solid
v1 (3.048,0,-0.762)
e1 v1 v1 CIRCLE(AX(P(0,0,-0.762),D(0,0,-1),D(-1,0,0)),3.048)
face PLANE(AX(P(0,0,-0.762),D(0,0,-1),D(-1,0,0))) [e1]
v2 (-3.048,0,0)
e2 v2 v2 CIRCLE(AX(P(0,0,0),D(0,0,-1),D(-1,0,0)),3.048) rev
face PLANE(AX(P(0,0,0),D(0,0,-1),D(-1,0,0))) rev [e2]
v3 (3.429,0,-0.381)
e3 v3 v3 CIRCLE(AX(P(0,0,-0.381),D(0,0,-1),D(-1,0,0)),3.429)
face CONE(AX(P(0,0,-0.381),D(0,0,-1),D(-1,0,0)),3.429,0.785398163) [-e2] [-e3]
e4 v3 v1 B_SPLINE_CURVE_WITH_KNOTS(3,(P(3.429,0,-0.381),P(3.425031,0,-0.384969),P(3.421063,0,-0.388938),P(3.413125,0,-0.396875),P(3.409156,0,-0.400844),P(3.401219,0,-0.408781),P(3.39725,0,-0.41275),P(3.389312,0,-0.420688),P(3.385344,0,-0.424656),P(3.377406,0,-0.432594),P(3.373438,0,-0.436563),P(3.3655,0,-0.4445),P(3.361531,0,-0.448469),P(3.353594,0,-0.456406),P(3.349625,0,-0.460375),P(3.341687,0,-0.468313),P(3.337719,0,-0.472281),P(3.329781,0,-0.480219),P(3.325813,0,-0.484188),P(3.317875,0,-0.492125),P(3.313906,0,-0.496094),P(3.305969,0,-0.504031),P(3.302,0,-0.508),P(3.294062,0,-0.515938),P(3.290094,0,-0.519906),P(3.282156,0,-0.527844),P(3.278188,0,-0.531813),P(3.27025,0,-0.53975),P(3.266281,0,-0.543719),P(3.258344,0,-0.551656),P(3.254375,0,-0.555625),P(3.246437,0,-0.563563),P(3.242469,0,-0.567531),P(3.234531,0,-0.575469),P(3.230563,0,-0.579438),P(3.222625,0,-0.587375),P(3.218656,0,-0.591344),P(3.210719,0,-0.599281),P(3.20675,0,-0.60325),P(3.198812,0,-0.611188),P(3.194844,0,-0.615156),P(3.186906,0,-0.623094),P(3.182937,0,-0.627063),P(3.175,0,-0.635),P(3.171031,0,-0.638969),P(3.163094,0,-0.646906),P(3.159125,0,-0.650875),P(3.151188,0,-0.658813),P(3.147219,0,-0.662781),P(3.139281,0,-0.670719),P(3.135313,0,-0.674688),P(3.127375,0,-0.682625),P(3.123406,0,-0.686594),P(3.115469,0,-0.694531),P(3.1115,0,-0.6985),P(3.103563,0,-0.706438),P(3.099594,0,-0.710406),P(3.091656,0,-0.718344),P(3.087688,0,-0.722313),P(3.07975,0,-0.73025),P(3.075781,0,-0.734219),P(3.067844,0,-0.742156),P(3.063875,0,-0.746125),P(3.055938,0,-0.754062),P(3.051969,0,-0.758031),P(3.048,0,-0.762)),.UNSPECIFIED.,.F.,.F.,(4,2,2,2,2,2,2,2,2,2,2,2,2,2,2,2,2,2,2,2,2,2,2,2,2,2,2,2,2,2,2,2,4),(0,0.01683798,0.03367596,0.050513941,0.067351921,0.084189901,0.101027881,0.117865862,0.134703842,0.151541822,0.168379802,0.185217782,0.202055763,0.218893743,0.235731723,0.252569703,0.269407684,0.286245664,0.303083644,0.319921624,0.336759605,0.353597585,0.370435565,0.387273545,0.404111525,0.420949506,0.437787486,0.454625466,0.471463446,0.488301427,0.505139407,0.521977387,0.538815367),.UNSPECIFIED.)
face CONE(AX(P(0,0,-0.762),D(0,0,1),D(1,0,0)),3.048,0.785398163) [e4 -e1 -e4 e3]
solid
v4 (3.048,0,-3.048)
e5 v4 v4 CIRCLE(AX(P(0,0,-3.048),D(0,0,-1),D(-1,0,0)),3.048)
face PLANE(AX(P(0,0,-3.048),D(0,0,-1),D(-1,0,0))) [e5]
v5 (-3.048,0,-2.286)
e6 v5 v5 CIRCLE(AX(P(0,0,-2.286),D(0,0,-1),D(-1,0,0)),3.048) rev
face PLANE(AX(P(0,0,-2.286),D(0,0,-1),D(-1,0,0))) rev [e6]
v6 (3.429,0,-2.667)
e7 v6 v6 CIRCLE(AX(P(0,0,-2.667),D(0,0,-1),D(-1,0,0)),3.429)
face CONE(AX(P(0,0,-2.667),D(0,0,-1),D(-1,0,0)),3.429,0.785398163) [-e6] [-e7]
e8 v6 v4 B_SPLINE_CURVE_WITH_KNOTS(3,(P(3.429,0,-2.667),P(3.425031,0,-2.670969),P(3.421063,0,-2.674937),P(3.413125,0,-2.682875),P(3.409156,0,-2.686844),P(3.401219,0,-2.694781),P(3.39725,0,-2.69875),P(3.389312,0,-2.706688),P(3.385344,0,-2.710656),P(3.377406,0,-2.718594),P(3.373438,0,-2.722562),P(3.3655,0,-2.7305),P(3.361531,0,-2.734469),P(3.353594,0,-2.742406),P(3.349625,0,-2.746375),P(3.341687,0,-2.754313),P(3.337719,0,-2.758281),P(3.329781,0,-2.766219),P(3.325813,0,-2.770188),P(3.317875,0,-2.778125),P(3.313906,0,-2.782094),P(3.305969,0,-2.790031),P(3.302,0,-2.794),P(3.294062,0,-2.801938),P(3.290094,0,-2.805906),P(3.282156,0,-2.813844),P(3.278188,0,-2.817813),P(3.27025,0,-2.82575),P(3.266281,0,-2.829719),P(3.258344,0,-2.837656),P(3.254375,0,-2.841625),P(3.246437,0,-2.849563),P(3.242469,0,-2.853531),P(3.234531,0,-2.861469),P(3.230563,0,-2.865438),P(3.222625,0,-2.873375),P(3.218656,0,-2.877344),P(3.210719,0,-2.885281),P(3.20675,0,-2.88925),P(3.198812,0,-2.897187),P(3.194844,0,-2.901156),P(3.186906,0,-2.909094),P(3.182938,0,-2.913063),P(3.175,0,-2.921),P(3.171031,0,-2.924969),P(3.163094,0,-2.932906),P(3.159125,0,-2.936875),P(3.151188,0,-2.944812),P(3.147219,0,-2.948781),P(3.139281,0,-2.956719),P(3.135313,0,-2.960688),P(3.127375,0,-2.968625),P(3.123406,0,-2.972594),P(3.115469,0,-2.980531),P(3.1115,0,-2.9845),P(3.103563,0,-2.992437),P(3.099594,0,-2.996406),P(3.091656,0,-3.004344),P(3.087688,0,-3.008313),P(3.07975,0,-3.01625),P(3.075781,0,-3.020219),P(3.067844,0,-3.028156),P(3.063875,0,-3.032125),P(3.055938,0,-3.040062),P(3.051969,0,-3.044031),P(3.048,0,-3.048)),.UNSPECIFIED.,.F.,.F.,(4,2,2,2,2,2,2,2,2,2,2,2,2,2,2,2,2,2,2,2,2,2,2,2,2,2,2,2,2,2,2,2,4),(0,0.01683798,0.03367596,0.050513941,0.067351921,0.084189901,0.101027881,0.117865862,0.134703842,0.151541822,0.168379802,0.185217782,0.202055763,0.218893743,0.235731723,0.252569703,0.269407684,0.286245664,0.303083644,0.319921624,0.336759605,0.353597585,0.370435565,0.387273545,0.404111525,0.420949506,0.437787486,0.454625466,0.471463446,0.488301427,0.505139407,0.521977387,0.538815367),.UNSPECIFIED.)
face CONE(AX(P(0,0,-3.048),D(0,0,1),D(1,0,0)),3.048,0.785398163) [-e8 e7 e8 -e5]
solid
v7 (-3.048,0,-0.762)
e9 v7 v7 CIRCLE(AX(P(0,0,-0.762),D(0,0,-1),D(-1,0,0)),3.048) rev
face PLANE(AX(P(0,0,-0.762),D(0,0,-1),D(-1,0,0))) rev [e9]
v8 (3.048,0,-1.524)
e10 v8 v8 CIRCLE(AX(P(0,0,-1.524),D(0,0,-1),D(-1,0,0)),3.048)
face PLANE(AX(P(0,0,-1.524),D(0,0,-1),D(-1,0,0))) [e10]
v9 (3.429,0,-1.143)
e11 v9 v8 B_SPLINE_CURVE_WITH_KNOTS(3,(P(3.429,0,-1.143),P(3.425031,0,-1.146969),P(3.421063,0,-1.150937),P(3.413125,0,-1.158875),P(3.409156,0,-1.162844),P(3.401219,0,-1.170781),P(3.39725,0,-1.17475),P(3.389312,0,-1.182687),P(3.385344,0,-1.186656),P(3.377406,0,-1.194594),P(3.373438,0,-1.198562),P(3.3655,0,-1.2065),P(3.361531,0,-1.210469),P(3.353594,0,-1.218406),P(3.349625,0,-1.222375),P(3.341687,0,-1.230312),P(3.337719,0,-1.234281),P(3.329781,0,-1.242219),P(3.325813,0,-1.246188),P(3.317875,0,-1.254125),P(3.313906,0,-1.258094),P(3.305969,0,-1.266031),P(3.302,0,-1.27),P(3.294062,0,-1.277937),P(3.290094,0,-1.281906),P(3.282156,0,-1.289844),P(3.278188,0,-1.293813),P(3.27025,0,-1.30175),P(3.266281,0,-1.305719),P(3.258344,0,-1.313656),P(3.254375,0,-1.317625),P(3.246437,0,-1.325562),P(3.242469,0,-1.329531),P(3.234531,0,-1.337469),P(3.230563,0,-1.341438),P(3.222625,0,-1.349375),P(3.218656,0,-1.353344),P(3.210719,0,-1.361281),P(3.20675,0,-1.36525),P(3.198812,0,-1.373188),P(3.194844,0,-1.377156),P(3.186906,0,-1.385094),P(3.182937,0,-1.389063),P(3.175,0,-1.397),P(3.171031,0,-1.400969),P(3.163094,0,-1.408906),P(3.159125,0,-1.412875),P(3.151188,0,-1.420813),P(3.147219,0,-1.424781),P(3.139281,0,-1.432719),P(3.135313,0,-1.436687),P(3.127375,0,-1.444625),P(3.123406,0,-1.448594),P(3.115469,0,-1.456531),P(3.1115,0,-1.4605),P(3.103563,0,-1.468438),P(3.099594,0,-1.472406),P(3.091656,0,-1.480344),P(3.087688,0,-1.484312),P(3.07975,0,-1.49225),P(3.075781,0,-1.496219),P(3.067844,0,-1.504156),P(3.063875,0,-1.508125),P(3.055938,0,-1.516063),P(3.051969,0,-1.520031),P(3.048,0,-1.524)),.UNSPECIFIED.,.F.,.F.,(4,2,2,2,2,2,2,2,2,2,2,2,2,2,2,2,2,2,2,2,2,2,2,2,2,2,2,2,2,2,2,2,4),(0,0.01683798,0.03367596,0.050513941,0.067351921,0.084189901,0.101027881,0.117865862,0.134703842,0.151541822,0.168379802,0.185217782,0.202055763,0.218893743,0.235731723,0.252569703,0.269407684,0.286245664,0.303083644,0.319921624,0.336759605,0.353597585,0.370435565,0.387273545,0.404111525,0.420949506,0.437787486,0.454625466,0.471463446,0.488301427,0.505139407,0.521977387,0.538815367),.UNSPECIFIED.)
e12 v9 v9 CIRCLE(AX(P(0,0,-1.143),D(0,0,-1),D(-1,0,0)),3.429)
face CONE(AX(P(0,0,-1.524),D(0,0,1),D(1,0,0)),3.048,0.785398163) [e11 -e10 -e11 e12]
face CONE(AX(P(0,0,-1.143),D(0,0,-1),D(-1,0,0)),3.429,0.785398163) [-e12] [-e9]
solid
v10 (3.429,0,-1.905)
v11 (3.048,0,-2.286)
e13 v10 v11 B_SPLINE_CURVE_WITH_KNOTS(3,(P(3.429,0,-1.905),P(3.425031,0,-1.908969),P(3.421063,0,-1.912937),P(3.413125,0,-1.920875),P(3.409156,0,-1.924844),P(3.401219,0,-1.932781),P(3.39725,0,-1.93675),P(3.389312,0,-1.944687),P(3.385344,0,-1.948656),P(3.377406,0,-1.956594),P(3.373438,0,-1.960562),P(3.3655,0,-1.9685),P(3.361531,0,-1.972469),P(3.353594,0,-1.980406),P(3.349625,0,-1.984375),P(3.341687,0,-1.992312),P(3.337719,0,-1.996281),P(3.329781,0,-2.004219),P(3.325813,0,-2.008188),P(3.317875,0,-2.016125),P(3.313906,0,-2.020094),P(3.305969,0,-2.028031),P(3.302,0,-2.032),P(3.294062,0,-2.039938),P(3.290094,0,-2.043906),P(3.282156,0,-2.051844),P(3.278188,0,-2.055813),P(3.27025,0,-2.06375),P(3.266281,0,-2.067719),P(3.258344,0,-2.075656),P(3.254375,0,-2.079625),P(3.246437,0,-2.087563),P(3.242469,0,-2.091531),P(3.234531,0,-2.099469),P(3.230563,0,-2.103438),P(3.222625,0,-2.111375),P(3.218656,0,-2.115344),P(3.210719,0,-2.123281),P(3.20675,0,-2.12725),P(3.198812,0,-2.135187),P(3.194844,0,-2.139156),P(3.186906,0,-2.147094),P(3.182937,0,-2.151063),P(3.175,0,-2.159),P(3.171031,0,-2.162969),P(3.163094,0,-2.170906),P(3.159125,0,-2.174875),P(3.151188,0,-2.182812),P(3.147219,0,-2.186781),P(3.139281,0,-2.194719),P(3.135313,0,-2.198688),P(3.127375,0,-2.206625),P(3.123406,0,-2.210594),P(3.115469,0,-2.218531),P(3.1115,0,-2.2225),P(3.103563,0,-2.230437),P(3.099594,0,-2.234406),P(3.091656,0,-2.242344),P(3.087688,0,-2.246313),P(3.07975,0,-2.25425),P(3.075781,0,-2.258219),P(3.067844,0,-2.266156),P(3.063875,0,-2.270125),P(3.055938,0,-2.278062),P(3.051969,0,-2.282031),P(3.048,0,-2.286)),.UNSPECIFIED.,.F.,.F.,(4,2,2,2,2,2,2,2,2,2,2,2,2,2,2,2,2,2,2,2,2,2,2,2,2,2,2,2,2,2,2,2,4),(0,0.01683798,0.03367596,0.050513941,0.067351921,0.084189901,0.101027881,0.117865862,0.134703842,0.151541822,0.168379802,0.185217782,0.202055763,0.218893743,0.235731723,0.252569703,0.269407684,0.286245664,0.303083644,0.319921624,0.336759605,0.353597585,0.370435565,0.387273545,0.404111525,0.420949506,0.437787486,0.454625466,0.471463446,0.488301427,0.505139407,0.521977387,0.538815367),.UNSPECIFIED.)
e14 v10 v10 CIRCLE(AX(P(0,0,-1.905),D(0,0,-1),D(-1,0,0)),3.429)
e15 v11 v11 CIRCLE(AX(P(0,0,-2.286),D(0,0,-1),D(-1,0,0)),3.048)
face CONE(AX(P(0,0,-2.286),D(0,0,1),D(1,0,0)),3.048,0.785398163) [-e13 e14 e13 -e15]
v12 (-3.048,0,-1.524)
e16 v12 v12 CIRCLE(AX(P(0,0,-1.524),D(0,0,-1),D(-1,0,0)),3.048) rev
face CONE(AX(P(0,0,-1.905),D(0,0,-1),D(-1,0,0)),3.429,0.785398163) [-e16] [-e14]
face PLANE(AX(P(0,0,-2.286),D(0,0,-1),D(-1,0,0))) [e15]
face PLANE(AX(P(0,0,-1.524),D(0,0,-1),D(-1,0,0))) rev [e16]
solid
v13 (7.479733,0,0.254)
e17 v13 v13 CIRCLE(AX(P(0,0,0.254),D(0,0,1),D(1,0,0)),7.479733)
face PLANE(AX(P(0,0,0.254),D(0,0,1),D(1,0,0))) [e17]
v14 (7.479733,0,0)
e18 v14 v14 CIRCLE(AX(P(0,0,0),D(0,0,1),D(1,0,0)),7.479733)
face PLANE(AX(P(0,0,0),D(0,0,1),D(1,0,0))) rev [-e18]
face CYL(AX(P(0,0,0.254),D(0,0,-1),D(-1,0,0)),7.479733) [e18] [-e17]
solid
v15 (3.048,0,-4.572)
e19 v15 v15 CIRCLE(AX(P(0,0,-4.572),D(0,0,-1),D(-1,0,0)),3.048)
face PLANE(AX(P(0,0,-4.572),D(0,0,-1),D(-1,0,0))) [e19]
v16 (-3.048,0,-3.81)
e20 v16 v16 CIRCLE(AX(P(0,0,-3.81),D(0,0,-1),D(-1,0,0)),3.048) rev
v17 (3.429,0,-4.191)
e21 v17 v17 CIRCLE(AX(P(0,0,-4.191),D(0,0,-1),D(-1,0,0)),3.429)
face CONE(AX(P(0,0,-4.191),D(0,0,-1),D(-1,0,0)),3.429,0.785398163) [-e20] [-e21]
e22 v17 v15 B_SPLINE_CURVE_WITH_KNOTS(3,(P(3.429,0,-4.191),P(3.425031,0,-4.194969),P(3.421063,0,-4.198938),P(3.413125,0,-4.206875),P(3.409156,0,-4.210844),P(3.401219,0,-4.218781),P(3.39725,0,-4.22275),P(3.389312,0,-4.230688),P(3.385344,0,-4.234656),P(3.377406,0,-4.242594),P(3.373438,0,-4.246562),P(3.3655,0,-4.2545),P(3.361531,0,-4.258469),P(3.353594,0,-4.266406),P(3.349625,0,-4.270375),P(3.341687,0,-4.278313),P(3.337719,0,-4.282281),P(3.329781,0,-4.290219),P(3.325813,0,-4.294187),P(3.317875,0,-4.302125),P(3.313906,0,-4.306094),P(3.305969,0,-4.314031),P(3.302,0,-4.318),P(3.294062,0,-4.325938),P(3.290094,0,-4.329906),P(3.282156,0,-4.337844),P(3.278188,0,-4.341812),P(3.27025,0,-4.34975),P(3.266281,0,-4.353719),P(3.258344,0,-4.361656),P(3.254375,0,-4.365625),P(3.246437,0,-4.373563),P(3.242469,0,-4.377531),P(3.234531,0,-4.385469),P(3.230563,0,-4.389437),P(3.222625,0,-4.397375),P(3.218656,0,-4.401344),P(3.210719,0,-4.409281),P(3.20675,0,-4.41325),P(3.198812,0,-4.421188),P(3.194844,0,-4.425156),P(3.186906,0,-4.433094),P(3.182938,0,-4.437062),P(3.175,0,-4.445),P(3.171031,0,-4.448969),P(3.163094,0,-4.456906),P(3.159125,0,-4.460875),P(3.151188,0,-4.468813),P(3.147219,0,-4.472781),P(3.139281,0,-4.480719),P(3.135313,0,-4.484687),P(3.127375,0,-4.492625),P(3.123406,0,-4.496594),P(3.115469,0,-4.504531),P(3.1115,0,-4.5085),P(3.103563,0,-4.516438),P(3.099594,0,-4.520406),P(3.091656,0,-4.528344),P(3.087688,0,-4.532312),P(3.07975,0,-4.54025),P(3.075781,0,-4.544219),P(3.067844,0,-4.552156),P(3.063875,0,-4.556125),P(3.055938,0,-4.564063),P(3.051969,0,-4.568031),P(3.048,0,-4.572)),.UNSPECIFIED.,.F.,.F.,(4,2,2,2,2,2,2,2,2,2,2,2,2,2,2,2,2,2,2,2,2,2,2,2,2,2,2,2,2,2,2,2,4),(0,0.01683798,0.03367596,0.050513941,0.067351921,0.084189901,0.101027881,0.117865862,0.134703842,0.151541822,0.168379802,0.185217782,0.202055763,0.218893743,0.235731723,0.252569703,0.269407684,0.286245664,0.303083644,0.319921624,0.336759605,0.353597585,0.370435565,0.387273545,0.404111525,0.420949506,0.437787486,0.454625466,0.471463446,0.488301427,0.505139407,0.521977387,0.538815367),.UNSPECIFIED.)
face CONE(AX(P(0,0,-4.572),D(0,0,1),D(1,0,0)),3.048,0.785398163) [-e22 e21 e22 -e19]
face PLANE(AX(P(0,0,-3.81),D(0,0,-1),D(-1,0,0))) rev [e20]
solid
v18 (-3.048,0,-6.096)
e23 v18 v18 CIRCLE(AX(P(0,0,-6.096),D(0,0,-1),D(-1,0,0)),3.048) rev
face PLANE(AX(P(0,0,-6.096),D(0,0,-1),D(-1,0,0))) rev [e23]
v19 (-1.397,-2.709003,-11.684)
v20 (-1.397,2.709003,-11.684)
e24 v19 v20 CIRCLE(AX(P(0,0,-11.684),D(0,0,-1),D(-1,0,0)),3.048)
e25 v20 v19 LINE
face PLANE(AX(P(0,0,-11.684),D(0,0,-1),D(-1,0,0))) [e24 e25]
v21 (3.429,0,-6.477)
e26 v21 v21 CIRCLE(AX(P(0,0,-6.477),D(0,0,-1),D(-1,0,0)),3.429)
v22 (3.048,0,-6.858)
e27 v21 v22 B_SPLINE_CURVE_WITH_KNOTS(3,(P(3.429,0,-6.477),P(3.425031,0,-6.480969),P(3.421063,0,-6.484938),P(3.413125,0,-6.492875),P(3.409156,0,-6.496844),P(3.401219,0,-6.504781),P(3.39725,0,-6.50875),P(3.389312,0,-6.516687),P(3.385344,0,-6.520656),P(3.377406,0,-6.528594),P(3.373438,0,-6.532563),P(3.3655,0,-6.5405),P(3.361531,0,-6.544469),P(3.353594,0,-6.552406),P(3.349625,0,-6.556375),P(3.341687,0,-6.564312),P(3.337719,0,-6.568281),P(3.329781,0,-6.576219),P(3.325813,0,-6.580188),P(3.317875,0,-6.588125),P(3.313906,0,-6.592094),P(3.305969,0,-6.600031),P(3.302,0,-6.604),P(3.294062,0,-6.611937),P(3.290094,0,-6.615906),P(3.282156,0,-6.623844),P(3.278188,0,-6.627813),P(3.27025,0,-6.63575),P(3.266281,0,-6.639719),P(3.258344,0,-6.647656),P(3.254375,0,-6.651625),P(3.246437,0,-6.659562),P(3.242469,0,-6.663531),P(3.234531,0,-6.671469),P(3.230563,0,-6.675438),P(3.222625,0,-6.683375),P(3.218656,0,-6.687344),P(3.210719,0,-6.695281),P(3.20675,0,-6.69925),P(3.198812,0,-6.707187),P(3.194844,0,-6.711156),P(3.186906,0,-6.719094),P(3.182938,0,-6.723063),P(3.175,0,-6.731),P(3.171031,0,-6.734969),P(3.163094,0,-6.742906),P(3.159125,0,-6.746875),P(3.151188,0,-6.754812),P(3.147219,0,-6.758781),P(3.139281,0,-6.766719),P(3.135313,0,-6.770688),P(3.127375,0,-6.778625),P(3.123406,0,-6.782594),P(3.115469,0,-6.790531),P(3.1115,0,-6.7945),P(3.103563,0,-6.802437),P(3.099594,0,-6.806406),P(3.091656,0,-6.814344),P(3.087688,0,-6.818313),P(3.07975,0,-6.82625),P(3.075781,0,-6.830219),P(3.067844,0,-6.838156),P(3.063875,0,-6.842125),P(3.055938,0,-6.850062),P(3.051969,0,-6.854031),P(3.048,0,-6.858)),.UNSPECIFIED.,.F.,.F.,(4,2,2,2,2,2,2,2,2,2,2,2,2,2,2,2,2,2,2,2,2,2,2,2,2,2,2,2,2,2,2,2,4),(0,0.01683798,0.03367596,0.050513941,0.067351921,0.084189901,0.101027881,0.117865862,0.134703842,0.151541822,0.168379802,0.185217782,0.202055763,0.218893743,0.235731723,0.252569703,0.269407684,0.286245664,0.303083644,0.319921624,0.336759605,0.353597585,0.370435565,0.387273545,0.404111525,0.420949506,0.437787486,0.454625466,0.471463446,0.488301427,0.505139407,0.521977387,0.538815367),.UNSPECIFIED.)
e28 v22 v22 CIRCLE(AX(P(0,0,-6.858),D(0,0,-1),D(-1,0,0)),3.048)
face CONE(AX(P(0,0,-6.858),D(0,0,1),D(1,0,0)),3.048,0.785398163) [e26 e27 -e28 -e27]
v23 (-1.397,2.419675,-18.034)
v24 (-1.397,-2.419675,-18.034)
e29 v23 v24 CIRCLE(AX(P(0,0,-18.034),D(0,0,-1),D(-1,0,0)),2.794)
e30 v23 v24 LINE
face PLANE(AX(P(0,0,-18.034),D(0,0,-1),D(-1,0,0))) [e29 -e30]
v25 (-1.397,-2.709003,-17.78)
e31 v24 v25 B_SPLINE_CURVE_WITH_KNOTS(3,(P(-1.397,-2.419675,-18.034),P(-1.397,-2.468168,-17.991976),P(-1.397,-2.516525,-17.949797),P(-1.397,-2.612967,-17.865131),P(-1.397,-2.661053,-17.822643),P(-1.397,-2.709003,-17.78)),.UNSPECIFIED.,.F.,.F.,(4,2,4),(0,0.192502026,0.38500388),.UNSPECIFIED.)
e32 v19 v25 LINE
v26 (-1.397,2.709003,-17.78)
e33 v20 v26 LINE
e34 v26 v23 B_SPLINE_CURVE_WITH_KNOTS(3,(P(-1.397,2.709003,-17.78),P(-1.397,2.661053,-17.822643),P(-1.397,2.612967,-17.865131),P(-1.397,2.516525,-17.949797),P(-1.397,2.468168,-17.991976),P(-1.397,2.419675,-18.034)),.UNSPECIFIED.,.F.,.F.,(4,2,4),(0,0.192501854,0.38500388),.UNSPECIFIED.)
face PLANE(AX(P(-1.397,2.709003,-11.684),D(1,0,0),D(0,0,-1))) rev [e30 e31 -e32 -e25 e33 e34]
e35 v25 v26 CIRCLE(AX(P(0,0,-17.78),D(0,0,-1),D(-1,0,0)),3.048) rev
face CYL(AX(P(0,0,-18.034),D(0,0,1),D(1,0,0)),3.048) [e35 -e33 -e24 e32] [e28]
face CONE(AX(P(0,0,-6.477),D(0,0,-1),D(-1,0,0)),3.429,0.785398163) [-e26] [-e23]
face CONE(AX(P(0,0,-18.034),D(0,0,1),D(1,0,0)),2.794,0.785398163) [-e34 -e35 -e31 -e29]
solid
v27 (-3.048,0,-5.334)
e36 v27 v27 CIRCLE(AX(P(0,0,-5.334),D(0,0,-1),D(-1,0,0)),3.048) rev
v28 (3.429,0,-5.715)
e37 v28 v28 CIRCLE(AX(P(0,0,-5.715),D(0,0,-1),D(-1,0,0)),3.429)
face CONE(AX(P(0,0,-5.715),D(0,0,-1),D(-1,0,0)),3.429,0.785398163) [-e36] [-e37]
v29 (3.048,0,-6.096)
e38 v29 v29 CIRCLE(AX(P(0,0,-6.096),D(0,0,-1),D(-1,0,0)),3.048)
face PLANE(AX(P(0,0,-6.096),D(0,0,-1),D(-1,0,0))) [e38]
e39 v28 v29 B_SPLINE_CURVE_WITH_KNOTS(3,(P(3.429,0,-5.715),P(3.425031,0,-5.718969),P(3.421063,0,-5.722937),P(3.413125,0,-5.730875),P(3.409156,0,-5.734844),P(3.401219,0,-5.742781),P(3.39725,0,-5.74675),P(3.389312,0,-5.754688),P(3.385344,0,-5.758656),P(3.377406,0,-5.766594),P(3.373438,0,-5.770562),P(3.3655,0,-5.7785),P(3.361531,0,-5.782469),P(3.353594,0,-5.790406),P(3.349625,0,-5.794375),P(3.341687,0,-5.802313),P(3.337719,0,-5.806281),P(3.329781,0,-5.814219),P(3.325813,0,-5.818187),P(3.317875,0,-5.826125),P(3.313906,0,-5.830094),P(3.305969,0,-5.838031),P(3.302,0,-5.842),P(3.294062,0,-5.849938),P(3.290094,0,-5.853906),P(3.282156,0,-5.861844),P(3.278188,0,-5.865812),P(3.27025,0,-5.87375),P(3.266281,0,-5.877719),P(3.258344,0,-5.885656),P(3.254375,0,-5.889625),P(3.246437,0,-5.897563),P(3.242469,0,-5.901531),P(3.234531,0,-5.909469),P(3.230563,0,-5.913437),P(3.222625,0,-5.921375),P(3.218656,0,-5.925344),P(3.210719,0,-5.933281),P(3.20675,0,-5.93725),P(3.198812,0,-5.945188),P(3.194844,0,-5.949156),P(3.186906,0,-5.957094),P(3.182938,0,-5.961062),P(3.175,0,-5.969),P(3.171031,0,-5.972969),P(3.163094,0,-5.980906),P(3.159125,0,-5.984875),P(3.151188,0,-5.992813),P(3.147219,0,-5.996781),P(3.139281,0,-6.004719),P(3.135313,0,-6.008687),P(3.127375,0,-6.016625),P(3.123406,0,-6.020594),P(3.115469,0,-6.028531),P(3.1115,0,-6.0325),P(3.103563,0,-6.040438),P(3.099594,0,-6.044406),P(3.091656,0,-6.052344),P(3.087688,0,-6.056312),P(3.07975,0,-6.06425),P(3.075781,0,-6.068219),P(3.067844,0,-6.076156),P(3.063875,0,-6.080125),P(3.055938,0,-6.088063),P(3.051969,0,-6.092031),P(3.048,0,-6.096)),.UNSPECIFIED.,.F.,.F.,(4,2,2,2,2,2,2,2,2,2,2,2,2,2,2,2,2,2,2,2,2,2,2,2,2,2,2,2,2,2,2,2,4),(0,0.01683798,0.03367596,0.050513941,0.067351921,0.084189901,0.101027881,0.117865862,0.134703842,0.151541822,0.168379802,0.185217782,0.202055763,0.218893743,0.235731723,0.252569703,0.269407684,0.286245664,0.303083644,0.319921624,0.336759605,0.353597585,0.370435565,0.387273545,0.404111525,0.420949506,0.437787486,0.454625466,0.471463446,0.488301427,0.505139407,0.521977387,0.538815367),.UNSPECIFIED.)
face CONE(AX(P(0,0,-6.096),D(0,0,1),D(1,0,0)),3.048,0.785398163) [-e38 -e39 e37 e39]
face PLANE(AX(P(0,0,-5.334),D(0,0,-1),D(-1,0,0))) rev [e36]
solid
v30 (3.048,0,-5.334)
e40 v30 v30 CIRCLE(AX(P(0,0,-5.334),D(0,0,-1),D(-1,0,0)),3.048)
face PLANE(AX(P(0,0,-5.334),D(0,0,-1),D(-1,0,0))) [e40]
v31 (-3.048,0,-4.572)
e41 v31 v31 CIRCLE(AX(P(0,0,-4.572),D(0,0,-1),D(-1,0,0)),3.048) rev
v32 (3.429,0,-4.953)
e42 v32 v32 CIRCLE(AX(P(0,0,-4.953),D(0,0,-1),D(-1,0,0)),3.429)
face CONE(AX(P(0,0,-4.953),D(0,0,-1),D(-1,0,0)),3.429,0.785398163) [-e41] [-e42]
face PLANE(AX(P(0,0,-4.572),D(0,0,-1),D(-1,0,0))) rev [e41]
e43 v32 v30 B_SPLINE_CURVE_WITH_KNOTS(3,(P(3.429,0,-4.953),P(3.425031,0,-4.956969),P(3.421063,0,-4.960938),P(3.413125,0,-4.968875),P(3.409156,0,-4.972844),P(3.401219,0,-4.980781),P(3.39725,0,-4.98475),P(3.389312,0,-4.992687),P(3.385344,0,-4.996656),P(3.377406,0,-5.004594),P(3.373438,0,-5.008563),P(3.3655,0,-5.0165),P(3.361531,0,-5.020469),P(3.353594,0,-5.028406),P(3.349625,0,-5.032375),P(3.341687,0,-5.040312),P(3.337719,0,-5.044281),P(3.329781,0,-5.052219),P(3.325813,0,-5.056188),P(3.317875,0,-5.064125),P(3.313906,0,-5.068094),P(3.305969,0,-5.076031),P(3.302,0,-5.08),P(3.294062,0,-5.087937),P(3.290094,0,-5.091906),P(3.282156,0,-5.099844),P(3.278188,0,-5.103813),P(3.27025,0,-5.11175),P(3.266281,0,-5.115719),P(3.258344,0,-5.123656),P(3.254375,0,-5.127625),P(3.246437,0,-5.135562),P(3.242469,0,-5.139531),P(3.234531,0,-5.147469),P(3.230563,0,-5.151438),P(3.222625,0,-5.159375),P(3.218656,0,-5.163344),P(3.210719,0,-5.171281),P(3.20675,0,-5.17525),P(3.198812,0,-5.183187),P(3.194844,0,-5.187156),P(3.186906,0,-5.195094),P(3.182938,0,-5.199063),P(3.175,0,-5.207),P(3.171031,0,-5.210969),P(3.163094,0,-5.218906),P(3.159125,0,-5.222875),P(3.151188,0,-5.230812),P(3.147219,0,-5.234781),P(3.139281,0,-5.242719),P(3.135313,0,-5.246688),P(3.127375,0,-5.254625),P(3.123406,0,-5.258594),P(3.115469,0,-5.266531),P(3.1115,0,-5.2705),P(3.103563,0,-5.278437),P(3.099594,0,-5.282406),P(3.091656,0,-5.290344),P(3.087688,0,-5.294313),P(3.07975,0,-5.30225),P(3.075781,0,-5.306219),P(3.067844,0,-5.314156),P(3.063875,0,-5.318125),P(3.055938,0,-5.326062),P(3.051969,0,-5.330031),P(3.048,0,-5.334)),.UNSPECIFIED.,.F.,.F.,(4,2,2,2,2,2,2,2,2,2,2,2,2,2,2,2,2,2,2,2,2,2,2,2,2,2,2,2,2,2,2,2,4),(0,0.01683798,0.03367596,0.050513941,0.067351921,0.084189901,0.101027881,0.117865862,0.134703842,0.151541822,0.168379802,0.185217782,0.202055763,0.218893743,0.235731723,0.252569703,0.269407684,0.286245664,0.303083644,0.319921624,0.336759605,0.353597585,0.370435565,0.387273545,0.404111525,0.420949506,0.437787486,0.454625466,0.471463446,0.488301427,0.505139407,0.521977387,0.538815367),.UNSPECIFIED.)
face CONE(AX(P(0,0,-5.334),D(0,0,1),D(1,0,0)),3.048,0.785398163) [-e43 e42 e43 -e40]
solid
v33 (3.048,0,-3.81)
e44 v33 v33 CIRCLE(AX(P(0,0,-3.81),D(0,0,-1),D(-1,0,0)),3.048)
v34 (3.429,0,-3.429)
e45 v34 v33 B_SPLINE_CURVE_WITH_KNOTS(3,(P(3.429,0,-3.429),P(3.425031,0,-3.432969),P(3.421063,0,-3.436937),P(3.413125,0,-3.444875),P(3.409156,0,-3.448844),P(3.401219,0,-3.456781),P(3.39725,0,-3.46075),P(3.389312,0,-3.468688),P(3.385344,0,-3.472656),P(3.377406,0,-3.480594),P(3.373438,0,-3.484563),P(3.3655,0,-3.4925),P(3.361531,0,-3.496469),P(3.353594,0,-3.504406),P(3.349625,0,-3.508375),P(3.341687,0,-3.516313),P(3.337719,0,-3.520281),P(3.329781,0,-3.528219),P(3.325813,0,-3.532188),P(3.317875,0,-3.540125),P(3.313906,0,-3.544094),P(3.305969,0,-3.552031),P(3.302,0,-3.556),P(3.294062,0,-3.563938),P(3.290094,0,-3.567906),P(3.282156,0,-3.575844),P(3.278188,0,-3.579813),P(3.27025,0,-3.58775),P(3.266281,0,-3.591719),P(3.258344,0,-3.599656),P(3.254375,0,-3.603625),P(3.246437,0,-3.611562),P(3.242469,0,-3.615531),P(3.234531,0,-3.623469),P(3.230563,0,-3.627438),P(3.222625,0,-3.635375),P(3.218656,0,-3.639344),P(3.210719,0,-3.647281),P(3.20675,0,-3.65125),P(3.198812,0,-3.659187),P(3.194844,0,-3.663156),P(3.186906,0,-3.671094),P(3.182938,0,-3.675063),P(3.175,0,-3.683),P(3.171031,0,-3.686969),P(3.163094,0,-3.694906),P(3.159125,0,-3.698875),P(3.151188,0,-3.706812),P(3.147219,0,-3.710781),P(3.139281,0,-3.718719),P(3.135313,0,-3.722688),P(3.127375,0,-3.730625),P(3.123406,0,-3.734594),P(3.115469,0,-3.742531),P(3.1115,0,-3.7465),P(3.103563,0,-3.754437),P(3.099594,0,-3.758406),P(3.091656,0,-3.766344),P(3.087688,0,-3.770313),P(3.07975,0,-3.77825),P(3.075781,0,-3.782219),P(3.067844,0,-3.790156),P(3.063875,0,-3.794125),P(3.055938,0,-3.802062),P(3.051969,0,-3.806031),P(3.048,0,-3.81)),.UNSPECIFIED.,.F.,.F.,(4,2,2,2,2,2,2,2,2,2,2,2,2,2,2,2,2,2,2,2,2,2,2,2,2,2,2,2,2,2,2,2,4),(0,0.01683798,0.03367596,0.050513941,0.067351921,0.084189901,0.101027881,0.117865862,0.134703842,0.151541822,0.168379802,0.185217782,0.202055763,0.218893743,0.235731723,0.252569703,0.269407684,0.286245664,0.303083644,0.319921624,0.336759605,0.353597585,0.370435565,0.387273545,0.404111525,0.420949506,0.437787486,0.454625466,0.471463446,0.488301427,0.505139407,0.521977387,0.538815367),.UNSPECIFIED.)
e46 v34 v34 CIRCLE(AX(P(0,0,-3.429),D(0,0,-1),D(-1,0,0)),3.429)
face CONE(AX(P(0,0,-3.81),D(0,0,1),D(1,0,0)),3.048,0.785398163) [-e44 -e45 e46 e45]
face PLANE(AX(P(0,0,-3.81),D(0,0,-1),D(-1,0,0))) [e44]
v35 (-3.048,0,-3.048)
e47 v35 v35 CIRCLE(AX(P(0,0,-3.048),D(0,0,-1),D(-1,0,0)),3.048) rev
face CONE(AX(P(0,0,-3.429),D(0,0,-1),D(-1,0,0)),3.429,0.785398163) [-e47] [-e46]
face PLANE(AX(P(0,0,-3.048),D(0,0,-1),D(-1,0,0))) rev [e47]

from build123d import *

# Parameters (mm, degrees)
SKETCH1_R           = 7.479732897
BOSS_EXTRUDE1_DEPTH = 0.254
SKETCH2_R           = 3.429
BOSS_EXTRUDE2_DEPTH = 0.762
CHAMFER1_SIZE       = 0.381
LPATTERN3_COUNT     = 9
LPATTERN3_PITCH     = 0.762
SKETCH3_R           = 3.048
BOSS_EXTRUDE3_DEPTH = 11.176
CUT_EXTRUDE1_DEPTH  = 6.35
CHAMFER2_SIZE       = 0.254


with BuildPart() as part:
    # Sketch1 → Boss-Extrude1 (new body)
    with BuildSketch(Plane.XY):
        Circle(SKETCH1_R)
    extrude(amount=BOSS_EXTRUDE1_DEPTH)


with BuildPart() as body_2:
    # Sketch2 → Boss-Extrude2 (new body)
    with BuildSketch(Plane(origin=(0, 0, 0), x_dir=(-1, 0, 0), z_dir=(0, 0, -1))):
        with Locations(Location((0, 0, 0), (0, 0, 180))):
            Circle(SKETCH2_R)
    extrude(amount=BOSS_EXTRUDE2_DEPTH)

    # Chamfer1
    chamfer1_edges = [body_2.edges().sort_by_distance(p)[0] for p in [
        (-3.429, 0, 0),
        (-3.429, 0, -0.762),
    ]]
    chamfer(chamfer1_edges, length=CHAMFER1_SIZE - 0.0001)  # a hair under: the kernel refuses the full size


with BuildPart() as lpattern3_1:
    # LPattern3: pattern copy
    add(body_2.part.moved(Location(Vector(0, 0, -1) * (1 * LPATTERN3_PITCH))))


with BuildPart() as lpattern3_2:
    # LPattern3: pattern copy
    add(body_2.part.moved(Location(Vector(0, 0, -1) * (2 * LPATTERN3_PITCH))))


with BuildPart() as lpattern3_3:
    # LPattern3: pattern copy
    add(body_2.part.moved(Location(Vector(0, 0, -1) * (3 * LPATTERN3_PITCH))))


with BuildPart() as lpattern3_4:
    # LPattern3: pattern copy
    add(body_2.part.moved(Location(Vector(0, 0, -1) * (4 * LPATTERN3_PITCH))))


with BuildPart() as lpattern3_5:
    # LPattern3: pattern copy
    add(body_2.part.moved(Location(Vector(0, 0, -1) * (5 * LPATTERN3_PITCH))))


with BuildPart() as lpattern3_6:
    # LPattern3: pattern copy
    add(body_2.part.moved(Location(Vector(0, 0, -1) * (6 * LPATTERN3_PITCH))))


with BuildPart() as lpattern3_7:
    # LPattern3: pattern copy
    add(body_2.part.moved(Location(Vector(0, 0, -1) * (7 * LPATTERN3_PITCH))))


with BuildPart() as lpattern3_8:
    # LPattern3: pattern copy
    add(body_2.part.moved(Location(Vector(0, 0, -1) * (8 * LPATTERN3_PITCH))))

    # Sketch3 → Boss-Extrude3 (add)
    with BuildSketch(Plane(origin=(0, 0, -6.858), x_dir=(-1, 0, 0), z_dir=(0, 0, -1))):
        with Locations(Location((0, 0, 0), (0, 0, 180))):
            Circle(SKETCH3_R)
    extrude(amount=BOSS_EXTRUDE3_DEPTH)

    # Sketch4 → Cut-Extrude1 (cut)
    with BuildSketch(Plane(origin=(0, 0, -18.034), x_dir=(-1, 0, 0), z_dir=(0, 0, -1))):
        with BuildLine():
            Line((1.397, 2.709002584), (1.397, -2.709002584))
            ThreePointArc((1.397, -2.709002584), (3.048, 0), (1.397, 2.709002584))
        make_face()
    extrude(amount=-CUT_EXTRUDE1_DEPTH, mode=Mode.SUBTRACT)

    # Chamfer2
    chamfer2_edges = [lpattern3_8.edges().sort_by_distance(p)[0] for p in [
        (1.586229492, -2.602725495, -18.034),
    ]]
    chamfer(chamfer2_edges, length=CHAMFER2_SIZE)


solid = Compound([part.part, body_2.part, lpattern3_1.part, lpattern3_2.part, lpattern3_3.part, lpattern3_4.part, lpattern3_5.part, lpattern3_6.part, lpattern3_7.part, lpattern3_8.part])
